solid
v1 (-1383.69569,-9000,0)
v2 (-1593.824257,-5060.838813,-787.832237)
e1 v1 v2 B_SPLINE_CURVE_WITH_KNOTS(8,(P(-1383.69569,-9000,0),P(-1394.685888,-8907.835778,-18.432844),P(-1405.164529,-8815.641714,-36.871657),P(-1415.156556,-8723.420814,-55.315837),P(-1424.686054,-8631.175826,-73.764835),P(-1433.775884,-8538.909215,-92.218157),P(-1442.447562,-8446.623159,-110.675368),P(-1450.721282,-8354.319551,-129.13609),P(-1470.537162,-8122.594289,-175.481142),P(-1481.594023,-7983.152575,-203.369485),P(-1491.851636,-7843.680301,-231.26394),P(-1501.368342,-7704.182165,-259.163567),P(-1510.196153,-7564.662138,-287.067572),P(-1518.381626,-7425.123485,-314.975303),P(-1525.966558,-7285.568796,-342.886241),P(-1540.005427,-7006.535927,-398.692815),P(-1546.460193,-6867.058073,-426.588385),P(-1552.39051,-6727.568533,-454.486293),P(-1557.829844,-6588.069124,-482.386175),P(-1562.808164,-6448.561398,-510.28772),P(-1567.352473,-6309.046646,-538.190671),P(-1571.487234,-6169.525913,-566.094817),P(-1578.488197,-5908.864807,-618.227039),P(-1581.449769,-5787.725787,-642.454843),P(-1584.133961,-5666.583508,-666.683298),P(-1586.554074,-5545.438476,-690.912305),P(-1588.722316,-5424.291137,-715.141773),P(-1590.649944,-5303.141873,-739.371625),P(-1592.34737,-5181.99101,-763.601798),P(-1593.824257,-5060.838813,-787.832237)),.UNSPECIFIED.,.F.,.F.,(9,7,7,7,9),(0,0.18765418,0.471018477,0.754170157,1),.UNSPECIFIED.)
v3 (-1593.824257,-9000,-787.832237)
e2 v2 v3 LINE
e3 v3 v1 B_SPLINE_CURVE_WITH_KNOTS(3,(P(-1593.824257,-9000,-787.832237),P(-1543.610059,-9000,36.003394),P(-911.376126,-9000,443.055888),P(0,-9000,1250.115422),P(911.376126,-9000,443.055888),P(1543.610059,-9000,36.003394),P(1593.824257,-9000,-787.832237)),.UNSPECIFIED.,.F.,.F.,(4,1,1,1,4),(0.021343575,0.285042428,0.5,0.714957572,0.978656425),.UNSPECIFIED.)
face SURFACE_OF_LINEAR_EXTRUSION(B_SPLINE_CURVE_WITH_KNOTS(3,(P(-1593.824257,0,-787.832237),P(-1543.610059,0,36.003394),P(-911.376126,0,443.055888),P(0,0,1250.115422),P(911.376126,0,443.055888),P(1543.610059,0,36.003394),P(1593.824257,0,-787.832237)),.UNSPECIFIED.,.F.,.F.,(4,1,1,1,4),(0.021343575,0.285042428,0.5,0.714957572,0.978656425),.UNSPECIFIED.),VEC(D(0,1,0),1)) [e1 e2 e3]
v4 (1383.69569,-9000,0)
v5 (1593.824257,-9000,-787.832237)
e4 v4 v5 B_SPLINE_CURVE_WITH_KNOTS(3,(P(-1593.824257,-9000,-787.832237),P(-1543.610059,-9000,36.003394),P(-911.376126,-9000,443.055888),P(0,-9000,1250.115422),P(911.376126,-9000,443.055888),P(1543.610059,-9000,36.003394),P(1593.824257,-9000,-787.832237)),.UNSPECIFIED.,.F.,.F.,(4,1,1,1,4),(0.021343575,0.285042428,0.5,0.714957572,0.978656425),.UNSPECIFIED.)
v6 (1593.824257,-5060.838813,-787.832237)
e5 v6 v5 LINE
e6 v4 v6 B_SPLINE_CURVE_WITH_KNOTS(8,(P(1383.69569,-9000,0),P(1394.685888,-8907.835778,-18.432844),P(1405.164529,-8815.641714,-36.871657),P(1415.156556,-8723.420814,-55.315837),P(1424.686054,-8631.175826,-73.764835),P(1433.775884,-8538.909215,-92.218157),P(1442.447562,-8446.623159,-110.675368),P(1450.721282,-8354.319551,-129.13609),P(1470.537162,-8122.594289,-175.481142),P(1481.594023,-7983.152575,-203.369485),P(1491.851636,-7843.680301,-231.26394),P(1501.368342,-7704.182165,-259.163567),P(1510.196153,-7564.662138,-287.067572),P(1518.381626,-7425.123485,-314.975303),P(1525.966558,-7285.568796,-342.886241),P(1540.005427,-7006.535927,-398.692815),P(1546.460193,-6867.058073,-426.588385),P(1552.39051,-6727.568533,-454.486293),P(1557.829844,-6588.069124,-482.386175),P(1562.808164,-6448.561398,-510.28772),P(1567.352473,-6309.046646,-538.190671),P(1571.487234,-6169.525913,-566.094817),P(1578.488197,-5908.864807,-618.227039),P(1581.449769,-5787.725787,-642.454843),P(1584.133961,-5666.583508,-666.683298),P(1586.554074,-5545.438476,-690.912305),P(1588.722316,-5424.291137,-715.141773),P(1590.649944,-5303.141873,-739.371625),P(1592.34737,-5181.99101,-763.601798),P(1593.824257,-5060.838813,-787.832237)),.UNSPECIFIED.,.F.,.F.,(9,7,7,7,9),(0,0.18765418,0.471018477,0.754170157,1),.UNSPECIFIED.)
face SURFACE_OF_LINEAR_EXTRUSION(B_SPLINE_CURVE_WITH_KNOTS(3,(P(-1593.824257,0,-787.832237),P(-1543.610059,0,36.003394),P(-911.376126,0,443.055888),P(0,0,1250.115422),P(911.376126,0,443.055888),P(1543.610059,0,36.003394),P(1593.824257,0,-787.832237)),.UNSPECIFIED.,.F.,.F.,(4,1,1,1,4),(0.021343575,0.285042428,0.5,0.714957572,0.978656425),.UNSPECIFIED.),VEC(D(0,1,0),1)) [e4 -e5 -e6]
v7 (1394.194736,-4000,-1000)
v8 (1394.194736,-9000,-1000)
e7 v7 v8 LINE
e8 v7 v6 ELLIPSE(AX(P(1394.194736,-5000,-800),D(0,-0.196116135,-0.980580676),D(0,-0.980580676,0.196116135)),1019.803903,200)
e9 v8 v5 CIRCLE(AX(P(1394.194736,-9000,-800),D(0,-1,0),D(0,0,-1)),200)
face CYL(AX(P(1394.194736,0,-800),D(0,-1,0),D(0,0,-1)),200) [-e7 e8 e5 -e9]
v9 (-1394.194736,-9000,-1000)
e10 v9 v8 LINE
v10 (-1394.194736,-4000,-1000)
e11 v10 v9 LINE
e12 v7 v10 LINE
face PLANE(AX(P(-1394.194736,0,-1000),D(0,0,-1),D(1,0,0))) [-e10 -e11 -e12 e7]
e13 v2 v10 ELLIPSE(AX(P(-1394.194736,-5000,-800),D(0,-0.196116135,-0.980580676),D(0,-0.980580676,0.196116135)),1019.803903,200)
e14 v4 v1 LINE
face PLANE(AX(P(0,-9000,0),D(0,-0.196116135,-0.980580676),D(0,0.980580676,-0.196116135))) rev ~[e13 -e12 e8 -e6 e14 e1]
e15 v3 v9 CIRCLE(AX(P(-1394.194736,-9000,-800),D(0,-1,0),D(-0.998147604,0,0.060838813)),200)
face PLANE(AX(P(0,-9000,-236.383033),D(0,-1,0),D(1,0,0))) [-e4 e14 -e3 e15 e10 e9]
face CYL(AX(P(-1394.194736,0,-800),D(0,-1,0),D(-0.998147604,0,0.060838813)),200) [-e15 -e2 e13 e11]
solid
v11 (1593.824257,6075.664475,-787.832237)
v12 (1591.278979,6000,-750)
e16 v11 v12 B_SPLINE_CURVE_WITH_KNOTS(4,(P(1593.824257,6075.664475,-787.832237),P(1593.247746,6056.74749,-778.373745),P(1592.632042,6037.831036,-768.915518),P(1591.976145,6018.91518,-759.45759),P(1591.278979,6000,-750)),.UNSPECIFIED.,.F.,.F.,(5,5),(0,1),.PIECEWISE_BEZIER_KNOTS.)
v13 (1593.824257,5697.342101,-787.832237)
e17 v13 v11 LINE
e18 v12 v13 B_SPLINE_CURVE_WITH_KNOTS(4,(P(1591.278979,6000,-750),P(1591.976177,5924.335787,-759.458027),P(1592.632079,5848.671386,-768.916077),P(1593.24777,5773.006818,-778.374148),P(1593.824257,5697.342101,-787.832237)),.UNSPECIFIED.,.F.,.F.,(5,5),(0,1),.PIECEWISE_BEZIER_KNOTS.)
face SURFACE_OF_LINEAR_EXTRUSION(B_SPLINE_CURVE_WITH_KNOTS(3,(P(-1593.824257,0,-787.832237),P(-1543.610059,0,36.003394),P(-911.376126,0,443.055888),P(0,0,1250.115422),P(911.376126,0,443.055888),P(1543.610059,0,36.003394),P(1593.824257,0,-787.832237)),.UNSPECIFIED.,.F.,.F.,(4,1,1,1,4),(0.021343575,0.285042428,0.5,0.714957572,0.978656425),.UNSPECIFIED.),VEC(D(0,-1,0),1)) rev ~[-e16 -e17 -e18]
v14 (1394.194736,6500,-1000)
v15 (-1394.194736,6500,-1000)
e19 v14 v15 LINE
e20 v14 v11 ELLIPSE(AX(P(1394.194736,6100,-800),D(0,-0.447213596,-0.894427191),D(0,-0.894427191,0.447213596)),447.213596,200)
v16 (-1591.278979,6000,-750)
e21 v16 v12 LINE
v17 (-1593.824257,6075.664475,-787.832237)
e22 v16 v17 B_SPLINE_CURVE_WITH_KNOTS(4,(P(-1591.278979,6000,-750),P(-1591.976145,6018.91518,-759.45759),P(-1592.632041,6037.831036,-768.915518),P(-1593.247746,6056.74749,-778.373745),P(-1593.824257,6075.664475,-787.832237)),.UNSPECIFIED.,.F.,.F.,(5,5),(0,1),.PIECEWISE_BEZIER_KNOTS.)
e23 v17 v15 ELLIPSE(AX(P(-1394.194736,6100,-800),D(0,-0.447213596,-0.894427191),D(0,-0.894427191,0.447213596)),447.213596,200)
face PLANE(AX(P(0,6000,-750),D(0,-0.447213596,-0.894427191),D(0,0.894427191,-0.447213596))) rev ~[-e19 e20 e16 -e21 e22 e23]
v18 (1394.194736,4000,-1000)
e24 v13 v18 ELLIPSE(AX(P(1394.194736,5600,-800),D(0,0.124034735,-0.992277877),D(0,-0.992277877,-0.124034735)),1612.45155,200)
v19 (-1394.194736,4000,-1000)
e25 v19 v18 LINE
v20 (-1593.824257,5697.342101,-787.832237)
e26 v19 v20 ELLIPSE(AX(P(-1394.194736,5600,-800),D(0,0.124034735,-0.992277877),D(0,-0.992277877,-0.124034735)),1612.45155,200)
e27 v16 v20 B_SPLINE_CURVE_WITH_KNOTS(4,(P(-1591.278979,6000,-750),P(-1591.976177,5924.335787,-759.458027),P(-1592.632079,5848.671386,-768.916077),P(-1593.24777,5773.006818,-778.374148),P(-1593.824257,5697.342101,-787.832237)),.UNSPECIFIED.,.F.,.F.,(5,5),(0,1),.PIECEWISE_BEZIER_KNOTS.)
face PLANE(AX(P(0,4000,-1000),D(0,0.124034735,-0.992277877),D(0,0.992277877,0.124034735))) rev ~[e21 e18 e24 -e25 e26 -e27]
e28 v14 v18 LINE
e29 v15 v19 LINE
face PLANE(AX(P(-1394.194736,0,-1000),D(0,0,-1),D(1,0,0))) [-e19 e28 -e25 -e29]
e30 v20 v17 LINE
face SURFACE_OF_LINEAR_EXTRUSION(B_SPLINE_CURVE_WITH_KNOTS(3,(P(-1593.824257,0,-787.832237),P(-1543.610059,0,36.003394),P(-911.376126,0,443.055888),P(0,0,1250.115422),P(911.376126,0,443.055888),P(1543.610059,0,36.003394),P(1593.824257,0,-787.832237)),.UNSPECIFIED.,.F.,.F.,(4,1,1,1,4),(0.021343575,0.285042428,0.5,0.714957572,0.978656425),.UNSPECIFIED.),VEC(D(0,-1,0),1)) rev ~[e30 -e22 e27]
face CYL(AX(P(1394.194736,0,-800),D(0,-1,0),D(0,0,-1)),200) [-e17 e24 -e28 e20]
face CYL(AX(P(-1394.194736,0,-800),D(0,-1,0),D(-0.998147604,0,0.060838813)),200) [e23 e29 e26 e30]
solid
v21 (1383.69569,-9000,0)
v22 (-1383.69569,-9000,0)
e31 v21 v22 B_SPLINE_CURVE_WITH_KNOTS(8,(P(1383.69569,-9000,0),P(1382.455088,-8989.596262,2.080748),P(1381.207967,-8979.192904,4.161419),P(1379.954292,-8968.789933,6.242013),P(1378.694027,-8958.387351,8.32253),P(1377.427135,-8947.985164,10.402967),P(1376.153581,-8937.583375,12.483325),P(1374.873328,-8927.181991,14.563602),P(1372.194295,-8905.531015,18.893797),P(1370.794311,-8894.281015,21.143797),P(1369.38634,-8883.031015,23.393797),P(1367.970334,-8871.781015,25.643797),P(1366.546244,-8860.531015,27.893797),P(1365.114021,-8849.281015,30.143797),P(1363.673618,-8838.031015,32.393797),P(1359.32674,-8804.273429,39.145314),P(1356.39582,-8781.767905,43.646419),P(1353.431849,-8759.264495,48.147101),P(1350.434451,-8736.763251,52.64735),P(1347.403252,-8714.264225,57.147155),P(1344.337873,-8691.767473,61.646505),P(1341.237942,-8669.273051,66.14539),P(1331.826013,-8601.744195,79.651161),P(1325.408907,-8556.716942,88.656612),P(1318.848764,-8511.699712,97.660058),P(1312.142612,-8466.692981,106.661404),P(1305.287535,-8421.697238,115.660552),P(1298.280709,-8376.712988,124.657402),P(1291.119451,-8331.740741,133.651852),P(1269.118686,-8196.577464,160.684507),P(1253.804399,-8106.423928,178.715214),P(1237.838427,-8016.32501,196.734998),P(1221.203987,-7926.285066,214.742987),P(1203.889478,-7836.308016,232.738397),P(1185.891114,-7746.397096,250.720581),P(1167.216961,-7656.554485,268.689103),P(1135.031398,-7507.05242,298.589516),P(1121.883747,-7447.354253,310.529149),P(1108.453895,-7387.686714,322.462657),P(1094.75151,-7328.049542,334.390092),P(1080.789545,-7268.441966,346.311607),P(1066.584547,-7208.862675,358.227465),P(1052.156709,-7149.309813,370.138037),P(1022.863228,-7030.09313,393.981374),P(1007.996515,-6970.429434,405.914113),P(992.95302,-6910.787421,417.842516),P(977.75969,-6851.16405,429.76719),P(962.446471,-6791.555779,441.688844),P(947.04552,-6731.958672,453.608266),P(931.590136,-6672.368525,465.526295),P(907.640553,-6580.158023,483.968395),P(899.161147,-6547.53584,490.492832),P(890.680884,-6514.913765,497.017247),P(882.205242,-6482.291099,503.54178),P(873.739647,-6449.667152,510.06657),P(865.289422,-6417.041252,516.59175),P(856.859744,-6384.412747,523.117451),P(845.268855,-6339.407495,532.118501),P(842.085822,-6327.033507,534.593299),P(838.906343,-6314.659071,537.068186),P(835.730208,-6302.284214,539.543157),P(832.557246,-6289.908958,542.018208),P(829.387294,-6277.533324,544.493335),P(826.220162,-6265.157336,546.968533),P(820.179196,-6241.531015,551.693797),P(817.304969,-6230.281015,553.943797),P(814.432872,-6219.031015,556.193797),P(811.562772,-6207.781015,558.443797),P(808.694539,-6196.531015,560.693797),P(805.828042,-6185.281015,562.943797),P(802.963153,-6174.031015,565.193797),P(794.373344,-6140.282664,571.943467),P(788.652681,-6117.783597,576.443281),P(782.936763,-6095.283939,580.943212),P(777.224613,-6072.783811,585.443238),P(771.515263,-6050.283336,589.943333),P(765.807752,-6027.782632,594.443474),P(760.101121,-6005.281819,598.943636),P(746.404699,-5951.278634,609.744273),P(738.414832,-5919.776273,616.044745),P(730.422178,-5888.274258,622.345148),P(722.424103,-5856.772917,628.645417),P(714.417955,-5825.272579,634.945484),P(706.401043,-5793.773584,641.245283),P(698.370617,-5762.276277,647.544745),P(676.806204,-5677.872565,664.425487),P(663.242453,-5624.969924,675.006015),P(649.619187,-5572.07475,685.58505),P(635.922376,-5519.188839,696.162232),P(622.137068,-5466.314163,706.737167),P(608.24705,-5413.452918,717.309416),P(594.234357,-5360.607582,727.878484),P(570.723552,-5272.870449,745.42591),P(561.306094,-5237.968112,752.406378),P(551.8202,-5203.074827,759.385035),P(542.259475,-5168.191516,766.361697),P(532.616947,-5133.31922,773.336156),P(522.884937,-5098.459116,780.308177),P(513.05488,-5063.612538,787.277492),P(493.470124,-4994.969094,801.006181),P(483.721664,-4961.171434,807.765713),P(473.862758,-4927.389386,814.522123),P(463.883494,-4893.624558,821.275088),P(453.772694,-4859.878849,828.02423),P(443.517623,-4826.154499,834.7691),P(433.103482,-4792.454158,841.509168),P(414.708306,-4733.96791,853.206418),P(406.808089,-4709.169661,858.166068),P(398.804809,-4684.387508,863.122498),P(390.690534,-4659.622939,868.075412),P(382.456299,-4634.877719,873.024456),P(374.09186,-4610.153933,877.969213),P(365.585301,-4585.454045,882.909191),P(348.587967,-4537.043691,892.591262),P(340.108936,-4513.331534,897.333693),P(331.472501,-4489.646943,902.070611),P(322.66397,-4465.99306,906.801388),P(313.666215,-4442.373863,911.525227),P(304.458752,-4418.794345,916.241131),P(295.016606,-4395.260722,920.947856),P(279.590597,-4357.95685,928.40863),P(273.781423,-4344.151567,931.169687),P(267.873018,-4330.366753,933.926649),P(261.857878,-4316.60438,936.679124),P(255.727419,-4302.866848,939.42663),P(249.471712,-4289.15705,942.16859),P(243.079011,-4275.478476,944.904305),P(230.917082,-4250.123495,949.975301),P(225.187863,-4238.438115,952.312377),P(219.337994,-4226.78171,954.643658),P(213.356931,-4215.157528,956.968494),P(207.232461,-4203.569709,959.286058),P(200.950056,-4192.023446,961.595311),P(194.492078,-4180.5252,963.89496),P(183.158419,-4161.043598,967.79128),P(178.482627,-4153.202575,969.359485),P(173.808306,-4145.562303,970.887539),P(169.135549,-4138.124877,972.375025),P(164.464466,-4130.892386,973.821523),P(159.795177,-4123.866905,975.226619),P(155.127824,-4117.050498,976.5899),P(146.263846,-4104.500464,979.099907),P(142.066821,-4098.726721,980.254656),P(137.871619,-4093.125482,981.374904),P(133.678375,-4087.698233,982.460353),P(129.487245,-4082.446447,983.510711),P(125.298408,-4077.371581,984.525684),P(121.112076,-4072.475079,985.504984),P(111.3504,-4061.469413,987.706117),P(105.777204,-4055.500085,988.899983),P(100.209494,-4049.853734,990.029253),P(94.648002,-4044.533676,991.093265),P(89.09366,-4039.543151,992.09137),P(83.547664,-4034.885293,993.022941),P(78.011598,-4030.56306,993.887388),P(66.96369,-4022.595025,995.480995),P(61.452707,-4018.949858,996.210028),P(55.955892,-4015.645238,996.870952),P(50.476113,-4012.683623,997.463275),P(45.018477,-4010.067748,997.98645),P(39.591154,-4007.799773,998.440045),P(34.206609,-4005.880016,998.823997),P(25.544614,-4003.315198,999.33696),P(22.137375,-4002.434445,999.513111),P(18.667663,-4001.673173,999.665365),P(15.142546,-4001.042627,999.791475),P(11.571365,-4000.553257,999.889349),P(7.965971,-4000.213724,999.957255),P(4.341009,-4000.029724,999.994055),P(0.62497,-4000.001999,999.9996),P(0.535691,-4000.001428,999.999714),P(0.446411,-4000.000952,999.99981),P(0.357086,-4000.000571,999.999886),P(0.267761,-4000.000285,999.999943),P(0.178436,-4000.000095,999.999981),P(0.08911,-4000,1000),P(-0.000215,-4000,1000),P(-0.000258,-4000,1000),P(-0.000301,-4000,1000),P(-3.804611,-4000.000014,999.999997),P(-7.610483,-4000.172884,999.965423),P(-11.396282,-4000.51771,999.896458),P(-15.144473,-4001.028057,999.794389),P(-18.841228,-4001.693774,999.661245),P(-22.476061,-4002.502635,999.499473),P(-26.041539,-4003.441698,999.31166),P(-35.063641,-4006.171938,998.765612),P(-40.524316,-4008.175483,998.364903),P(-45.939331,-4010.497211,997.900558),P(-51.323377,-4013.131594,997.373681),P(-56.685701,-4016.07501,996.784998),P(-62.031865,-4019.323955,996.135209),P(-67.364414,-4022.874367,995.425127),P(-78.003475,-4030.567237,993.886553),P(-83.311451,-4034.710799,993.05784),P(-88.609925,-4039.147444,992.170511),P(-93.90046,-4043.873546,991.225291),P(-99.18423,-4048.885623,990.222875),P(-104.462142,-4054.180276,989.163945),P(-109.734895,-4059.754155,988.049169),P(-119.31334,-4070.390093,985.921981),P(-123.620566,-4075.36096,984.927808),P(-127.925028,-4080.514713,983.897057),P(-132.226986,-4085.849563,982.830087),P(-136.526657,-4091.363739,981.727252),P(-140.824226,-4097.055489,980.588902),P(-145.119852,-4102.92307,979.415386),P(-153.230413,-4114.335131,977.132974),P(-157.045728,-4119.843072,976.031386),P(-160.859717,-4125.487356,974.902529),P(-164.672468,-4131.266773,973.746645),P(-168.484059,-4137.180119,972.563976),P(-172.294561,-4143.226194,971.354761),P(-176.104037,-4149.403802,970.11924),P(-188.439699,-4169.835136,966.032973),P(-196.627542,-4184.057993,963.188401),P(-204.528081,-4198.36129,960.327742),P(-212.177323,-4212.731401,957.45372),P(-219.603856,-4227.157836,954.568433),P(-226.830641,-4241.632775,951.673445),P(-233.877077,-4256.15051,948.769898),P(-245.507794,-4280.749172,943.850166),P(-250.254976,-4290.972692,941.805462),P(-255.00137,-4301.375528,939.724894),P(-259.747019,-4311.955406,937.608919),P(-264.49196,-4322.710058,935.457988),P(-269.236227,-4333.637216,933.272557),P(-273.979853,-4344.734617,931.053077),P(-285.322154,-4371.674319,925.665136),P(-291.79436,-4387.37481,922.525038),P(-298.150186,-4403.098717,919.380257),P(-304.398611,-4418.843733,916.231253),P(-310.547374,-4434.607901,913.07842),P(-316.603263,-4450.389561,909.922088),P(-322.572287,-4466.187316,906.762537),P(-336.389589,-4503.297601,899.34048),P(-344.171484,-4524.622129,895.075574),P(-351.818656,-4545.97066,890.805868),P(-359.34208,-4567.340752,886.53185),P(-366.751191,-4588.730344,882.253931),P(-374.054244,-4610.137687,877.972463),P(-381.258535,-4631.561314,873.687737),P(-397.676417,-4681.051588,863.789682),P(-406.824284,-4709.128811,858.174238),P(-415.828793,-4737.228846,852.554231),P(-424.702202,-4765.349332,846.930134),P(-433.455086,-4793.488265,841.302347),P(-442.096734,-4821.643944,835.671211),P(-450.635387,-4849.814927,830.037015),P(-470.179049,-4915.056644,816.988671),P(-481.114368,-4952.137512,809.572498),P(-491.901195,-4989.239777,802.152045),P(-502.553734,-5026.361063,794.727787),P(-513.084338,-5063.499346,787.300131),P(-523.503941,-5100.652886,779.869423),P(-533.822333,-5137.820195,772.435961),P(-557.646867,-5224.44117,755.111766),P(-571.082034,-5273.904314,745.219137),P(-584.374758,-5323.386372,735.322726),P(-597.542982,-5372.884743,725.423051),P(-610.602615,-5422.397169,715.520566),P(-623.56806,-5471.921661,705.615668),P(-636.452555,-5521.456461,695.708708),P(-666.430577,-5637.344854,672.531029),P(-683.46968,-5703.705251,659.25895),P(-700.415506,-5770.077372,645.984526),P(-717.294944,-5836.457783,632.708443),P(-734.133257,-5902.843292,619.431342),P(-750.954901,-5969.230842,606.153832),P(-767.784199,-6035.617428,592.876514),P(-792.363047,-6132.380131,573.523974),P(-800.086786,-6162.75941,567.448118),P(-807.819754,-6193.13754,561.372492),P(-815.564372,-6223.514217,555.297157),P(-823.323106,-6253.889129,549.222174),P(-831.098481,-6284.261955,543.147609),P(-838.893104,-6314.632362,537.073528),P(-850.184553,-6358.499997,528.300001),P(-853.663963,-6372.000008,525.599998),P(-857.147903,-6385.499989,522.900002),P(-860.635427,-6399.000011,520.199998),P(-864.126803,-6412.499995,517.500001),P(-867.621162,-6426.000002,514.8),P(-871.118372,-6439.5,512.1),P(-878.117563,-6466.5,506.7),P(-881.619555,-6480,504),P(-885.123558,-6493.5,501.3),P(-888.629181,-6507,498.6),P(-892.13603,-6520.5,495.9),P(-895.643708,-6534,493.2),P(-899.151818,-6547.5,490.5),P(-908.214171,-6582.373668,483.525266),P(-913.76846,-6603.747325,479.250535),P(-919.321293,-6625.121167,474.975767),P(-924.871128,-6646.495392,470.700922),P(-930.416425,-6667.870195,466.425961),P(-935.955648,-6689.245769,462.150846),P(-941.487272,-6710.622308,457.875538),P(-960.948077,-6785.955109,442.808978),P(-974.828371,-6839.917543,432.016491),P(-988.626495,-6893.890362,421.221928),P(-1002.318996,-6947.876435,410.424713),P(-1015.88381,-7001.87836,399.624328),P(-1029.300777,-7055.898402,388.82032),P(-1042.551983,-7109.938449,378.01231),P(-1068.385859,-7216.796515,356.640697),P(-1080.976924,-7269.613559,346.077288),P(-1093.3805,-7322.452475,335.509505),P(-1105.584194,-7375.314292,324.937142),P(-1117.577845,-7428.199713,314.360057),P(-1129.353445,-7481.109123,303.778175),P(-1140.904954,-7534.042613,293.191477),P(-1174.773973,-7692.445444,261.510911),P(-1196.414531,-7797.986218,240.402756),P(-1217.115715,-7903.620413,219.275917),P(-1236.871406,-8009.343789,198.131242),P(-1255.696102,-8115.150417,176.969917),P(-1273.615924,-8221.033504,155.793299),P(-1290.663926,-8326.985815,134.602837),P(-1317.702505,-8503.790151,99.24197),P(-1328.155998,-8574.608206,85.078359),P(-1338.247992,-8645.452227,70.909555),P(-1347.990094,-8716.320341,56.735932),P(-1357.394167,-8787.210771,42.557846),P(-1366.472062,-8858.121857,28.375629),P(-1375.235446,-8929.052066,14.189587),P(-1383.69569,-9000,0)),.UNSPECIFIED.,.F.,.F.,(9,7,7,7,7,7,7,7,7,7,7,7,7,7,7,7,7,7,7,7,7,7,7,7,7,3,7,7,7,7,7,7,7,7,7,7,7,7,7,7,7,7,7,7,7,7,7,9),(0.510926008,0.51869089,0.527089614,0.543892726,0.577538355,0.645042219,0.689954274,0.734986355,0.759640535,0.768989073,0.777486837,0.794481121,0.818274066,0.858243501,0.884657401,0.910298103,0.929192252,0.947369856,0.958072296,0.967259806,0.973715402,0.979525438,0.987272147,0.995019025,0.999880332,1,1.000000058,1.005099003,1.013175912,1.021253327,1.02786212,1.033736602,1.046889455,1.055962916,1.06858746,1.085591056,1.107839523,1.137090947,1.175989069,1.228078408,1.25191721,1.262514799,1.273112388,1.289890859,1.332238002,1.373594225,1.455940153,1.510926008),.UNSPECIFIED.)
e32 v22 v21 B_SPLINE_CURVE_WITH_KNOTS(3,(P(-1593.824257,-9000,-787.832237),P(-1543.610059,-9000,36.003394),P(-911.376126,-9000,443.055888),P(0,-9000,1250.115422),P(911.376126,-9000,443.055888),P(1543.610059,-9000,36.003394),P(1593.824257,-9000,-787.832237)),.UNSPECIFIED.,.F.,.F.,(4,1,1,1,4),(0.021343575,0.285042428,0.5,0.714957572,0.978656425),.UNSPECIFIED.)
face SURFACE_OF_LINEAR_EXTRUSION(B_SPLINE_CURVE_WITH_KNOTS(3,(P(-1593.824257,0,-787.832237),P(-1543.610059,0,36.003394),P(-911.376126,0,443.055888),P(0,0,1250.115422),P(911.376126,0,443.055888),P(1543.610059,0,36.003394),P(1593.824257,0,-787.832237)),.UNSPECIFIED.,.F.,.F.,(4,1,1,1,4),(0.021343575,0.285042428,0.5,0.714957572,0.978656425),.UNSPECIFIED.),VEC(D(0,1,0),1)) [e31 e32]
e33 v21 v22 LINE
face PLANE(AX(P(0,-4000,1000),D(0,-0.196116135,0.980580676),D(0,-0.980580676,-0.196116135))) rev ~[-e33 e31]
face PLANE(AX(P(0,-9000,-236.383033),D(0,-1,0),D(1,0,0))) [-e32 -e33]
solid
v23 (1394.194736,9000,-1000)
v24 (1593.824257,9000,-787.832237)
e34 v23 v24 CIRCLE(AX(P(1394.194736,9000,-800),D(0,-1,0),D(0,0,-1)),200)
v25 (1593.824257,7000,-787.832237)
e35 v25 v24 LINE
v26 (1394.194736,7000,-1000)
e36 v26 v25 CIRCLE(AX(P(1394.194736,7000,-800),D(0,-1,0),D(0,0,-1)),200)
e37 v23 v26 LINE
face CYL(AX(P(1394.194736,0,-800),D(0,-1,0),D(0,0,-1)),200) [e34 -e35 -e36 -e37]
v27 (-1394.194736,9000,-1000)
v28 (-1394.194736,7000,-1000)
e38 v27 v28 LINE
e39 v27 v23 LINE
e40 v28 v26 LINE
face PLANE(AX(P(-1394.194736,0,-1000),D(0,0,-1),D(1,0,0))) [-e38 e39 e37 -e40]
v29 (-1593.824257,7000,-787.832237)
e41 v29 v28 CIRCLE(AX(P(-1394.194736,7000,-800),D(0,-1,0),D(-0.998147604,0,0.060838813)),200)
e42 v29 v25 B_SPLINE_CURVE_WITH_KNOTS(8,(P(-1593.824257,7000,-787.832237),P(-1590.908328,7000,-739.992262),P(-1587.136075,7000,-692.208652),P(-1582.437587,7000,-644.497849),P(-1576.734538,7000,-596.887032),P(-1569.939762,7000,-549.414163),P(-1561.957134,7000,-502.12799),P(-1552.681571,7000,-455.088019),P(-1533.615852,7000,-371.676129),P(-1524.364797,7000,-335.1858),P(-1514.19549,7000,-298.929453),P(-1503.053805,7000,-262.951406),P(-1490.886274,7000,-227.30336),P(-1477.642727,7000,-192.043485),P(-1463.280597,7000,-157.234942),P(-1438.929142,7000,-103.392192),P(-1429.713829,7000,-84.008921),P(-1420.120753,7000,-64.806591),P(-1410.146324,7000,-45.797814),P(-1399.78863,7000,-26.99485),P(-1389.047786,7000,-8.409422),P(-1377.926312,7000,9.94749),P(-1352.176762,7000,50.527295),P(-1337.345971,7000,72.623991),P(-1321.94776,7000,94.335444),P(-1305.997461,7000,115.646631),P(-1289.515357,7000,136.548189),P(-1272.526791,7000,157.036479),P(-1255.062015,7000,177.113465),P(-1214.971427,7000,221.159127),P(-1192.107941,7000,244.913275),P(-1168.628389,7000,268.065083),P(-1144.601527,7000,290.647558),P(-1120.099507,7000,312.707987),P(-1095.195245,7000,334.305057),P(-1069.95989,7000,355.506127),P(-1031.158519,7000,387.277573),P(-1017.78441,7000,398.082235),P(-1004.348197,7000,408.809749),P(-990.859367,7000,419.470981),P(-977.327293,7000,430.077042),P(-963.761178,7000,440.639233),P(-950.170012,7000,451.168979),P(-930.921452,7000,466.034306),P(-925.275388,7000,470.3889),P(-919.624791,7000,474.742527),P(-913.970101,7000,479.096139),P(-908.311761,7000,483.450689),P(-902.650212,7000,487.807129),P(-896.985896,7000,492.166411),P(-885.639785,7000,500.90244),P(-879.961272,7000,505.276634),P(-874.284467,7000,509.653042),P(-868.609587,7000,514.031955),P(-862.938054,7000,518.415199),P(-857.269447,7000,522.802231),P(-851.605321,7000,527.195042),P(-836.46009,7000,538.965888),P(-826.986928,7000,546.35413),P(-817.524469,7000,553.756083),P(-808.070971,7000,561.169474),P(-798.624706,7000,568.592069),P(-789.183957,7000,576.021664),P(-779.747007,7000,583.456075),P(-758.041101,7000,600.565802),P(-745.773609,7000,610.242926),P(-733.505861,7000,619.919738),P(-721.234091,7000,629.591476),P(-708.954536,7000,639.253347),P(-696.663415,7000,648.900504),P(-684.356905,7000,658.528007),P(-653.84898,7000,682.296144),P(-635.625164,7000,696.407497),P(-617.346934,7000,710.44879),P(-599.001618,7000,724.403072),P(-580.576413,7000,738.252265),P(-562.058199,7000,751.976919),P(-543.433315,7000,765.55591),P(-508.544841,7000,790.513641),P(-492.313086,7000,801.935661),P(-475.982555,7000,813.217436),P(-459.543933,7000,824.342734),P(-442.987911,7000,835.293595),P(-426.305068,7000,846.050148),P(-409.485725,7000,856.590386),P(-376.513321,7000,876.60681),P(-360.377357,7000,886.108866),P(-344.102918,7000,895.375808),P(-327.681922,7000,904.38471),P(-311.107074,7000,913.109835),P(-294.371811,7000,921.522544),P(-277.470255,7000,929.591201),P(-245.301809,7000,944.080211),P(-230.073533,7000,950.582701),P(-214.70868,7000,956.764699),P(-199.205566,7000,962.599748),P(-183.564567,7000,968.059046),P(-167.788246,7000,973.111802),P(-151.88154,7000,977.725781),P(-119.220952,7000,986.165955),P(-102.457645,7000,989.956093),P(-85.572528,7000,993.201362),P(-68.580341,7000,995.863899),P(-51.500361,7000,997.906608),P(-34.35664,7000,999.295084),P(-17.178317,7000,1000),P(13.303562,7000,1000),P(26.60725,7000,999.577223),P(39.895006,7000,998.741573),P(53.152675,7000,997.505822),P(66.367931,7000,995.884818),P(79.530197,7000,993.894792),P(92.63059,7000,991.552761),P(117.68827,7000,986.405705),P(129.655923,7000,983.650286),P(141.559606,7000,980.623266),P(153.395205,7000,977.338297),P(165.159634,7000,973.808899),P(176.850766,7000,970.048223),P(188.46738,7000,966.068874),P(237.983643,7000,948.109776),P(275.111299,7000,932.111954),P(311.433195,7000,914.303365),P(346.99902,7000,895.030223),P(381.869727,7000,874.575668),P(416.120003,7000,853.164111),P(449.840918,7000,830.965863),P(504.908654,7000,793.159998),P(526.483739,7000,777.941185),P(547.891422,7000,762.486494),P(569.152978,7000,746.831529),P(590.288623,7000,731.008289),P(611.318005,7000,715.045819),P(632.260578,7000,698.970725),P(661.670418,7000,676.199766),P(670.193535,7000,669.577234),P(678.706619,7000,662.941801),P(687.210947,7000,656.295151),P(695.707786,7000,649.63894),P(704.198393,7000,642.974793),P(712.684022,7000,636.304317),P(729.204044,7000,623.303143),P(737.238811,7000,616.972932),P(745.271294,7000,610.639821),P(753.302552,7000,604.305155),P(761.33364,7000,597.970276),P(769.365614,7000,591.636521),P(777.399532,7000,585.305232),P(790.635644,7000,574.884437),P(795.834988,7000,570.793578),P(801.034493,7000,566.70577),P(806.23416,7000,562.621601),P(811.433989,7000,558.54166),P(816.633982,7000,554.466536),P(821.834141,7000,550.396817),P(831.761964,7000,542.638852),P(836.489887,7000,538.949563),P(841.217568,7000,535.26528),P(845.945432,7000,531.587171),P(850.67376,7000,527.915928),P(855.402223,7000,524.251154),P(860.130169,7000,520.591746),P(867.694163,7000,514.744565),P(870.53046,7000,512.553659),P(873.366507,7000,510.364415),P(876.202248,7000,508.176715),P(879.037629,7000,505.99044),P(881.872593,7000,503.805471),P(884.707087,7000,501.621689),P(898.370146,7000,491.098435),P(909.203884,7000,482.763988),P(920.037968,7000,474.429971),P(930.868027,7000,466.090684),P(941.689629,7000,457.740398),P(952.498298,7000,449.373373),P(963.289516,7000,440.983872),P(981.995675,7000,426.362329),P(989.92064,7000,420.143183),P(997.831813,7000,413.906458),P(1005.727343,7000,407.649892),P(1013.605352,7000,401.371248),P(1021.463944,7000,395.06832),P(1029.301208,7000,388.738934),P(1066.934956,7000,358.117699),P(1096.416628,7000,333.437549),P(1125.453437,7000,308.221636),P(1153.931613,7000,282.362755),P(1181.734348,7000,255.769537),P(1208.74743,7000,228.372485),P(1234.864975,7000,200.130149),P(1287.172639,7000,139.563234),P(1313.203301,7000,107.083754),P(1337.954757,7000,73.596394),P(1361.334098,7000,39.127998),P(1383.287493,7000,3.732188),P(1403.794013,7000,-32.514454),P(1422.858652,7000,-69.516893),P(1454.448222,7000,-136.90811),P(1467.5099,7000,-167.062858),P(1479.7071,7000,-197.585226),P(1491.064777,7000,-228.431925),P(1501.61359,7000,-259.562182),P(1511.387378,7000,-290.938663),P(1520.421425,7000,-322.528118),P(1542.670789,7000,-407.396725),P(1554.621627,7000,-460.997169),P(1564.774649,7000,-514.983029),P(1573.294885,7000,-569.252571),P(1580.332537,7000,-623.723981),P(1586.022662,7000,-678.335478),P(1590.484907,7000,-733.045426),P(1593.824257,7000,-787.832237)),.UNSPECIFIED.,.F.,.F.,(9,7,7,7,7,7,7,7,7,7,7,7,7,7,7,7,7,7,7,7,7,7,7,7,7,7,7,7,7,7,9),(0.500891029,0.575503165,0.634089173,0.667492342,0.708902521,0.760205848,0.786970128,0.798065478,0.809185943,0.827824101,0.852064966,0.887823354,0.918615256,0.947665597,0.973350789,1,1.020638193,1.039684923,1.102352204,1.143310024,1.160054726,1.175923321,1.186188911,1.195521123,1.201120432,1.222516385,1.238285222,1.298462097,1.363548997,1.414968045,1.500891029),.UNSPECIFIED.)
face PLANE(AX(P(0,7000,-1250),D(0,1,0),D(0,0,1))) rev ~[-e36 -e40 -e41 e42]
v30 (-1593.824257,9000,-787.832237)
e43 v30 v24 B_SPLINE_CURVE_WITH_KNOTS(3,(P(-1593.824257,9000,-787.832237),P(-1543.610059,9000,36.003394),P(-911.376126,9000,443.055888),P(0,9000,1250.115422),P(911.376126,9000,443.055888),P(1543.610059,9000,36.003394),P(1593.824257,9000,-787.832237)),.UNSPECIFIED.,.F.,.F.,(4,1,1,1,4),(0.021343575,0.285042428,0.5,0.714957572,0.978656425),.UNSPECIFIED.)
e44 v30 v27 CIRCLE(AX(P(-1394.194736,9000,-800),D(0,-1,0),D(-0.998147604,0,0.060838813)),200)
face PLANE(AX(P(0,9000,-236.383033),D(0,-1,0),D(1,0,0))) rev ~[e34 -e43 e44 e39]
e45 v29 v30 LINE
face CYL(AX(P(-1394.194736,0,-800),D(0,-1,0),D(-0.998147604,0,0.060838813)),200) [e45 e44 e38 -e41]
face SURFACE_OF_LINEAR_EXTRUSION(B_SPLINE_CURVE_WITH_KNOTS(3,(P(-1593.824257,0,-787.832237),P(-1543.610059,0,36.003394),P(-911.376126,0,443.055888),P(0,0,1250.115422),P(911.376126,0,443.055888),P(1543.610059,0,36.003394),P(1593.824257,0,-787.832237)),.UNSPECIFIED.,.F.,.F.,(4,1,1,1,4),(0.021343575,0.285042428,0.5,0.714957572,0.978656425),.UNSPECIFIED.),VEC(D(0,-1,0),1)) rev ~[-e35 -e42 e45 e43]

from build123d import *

# Parameters (mm, degrees)
F2_DEPTH = 9000
F0_W     = 8000
F0_H     = 2000
F3_DEPTH = 2500


with BuildPart() as f2:
    # F1 (on Front) → F2 (new body, symmetric)
    with BuildSketch(Plane.XZ):
        with BuildLine():
            ThreePointArc((-1593.8242572385, -787.8322373844), (-1539.854532805, -937.0519016228), (-1394.1947364933, -1000))
            Line((-1394.1947364933, -1000), (1394.1947364933, -1000))
            ThreePointArc((1394.1947364933, -1000), (1539.854532805, -937.0519016228), (1593.8242572385, -787.8322373844))
            add(Edge.make_bspline(
                [(-1593.8242572385, -787.8322373844), (-1543.6100586497, 36.0033941567), (-911.3761259503, 443.0558884844), (0, 1250.1154223925), (911.3761259503, 443.0558884844), (1543.6100586497, 36.0033941567), (1593.8242572385, -787.8322373844)],
                knots=[0.0213435754, 0.0213435754, 0.0213435754, 0.0213435754, 0.2850424282, 0.5, 0.7149575718, 0.9786564246, 0.9786564246, 0.9786564246, 0.9786564246], degree=3))
        make_face()
    extrude(amount=F2_DEPTH, both=True)

    # F0 (on Right) → F3 (cut, symmetric)
    with BuildSketch(Plane.YZ):
        Rectangle(F0_W, F0_H)
        Polygon((-4000, -1000), (-4000, 1000), (-9000, 0), align=None)
        Polygon((6000, 1000), (4000, 1000), (4000, -1000), (6000, -750), align=None)
        Polygon((7000, 1000), (6000, 1000), (6000, -750), (7000, -1250), align=None)
    extrude(amount=F3_DEPTH, both=True, mode=Mode.SUBTRACT)


solid = f2.part
